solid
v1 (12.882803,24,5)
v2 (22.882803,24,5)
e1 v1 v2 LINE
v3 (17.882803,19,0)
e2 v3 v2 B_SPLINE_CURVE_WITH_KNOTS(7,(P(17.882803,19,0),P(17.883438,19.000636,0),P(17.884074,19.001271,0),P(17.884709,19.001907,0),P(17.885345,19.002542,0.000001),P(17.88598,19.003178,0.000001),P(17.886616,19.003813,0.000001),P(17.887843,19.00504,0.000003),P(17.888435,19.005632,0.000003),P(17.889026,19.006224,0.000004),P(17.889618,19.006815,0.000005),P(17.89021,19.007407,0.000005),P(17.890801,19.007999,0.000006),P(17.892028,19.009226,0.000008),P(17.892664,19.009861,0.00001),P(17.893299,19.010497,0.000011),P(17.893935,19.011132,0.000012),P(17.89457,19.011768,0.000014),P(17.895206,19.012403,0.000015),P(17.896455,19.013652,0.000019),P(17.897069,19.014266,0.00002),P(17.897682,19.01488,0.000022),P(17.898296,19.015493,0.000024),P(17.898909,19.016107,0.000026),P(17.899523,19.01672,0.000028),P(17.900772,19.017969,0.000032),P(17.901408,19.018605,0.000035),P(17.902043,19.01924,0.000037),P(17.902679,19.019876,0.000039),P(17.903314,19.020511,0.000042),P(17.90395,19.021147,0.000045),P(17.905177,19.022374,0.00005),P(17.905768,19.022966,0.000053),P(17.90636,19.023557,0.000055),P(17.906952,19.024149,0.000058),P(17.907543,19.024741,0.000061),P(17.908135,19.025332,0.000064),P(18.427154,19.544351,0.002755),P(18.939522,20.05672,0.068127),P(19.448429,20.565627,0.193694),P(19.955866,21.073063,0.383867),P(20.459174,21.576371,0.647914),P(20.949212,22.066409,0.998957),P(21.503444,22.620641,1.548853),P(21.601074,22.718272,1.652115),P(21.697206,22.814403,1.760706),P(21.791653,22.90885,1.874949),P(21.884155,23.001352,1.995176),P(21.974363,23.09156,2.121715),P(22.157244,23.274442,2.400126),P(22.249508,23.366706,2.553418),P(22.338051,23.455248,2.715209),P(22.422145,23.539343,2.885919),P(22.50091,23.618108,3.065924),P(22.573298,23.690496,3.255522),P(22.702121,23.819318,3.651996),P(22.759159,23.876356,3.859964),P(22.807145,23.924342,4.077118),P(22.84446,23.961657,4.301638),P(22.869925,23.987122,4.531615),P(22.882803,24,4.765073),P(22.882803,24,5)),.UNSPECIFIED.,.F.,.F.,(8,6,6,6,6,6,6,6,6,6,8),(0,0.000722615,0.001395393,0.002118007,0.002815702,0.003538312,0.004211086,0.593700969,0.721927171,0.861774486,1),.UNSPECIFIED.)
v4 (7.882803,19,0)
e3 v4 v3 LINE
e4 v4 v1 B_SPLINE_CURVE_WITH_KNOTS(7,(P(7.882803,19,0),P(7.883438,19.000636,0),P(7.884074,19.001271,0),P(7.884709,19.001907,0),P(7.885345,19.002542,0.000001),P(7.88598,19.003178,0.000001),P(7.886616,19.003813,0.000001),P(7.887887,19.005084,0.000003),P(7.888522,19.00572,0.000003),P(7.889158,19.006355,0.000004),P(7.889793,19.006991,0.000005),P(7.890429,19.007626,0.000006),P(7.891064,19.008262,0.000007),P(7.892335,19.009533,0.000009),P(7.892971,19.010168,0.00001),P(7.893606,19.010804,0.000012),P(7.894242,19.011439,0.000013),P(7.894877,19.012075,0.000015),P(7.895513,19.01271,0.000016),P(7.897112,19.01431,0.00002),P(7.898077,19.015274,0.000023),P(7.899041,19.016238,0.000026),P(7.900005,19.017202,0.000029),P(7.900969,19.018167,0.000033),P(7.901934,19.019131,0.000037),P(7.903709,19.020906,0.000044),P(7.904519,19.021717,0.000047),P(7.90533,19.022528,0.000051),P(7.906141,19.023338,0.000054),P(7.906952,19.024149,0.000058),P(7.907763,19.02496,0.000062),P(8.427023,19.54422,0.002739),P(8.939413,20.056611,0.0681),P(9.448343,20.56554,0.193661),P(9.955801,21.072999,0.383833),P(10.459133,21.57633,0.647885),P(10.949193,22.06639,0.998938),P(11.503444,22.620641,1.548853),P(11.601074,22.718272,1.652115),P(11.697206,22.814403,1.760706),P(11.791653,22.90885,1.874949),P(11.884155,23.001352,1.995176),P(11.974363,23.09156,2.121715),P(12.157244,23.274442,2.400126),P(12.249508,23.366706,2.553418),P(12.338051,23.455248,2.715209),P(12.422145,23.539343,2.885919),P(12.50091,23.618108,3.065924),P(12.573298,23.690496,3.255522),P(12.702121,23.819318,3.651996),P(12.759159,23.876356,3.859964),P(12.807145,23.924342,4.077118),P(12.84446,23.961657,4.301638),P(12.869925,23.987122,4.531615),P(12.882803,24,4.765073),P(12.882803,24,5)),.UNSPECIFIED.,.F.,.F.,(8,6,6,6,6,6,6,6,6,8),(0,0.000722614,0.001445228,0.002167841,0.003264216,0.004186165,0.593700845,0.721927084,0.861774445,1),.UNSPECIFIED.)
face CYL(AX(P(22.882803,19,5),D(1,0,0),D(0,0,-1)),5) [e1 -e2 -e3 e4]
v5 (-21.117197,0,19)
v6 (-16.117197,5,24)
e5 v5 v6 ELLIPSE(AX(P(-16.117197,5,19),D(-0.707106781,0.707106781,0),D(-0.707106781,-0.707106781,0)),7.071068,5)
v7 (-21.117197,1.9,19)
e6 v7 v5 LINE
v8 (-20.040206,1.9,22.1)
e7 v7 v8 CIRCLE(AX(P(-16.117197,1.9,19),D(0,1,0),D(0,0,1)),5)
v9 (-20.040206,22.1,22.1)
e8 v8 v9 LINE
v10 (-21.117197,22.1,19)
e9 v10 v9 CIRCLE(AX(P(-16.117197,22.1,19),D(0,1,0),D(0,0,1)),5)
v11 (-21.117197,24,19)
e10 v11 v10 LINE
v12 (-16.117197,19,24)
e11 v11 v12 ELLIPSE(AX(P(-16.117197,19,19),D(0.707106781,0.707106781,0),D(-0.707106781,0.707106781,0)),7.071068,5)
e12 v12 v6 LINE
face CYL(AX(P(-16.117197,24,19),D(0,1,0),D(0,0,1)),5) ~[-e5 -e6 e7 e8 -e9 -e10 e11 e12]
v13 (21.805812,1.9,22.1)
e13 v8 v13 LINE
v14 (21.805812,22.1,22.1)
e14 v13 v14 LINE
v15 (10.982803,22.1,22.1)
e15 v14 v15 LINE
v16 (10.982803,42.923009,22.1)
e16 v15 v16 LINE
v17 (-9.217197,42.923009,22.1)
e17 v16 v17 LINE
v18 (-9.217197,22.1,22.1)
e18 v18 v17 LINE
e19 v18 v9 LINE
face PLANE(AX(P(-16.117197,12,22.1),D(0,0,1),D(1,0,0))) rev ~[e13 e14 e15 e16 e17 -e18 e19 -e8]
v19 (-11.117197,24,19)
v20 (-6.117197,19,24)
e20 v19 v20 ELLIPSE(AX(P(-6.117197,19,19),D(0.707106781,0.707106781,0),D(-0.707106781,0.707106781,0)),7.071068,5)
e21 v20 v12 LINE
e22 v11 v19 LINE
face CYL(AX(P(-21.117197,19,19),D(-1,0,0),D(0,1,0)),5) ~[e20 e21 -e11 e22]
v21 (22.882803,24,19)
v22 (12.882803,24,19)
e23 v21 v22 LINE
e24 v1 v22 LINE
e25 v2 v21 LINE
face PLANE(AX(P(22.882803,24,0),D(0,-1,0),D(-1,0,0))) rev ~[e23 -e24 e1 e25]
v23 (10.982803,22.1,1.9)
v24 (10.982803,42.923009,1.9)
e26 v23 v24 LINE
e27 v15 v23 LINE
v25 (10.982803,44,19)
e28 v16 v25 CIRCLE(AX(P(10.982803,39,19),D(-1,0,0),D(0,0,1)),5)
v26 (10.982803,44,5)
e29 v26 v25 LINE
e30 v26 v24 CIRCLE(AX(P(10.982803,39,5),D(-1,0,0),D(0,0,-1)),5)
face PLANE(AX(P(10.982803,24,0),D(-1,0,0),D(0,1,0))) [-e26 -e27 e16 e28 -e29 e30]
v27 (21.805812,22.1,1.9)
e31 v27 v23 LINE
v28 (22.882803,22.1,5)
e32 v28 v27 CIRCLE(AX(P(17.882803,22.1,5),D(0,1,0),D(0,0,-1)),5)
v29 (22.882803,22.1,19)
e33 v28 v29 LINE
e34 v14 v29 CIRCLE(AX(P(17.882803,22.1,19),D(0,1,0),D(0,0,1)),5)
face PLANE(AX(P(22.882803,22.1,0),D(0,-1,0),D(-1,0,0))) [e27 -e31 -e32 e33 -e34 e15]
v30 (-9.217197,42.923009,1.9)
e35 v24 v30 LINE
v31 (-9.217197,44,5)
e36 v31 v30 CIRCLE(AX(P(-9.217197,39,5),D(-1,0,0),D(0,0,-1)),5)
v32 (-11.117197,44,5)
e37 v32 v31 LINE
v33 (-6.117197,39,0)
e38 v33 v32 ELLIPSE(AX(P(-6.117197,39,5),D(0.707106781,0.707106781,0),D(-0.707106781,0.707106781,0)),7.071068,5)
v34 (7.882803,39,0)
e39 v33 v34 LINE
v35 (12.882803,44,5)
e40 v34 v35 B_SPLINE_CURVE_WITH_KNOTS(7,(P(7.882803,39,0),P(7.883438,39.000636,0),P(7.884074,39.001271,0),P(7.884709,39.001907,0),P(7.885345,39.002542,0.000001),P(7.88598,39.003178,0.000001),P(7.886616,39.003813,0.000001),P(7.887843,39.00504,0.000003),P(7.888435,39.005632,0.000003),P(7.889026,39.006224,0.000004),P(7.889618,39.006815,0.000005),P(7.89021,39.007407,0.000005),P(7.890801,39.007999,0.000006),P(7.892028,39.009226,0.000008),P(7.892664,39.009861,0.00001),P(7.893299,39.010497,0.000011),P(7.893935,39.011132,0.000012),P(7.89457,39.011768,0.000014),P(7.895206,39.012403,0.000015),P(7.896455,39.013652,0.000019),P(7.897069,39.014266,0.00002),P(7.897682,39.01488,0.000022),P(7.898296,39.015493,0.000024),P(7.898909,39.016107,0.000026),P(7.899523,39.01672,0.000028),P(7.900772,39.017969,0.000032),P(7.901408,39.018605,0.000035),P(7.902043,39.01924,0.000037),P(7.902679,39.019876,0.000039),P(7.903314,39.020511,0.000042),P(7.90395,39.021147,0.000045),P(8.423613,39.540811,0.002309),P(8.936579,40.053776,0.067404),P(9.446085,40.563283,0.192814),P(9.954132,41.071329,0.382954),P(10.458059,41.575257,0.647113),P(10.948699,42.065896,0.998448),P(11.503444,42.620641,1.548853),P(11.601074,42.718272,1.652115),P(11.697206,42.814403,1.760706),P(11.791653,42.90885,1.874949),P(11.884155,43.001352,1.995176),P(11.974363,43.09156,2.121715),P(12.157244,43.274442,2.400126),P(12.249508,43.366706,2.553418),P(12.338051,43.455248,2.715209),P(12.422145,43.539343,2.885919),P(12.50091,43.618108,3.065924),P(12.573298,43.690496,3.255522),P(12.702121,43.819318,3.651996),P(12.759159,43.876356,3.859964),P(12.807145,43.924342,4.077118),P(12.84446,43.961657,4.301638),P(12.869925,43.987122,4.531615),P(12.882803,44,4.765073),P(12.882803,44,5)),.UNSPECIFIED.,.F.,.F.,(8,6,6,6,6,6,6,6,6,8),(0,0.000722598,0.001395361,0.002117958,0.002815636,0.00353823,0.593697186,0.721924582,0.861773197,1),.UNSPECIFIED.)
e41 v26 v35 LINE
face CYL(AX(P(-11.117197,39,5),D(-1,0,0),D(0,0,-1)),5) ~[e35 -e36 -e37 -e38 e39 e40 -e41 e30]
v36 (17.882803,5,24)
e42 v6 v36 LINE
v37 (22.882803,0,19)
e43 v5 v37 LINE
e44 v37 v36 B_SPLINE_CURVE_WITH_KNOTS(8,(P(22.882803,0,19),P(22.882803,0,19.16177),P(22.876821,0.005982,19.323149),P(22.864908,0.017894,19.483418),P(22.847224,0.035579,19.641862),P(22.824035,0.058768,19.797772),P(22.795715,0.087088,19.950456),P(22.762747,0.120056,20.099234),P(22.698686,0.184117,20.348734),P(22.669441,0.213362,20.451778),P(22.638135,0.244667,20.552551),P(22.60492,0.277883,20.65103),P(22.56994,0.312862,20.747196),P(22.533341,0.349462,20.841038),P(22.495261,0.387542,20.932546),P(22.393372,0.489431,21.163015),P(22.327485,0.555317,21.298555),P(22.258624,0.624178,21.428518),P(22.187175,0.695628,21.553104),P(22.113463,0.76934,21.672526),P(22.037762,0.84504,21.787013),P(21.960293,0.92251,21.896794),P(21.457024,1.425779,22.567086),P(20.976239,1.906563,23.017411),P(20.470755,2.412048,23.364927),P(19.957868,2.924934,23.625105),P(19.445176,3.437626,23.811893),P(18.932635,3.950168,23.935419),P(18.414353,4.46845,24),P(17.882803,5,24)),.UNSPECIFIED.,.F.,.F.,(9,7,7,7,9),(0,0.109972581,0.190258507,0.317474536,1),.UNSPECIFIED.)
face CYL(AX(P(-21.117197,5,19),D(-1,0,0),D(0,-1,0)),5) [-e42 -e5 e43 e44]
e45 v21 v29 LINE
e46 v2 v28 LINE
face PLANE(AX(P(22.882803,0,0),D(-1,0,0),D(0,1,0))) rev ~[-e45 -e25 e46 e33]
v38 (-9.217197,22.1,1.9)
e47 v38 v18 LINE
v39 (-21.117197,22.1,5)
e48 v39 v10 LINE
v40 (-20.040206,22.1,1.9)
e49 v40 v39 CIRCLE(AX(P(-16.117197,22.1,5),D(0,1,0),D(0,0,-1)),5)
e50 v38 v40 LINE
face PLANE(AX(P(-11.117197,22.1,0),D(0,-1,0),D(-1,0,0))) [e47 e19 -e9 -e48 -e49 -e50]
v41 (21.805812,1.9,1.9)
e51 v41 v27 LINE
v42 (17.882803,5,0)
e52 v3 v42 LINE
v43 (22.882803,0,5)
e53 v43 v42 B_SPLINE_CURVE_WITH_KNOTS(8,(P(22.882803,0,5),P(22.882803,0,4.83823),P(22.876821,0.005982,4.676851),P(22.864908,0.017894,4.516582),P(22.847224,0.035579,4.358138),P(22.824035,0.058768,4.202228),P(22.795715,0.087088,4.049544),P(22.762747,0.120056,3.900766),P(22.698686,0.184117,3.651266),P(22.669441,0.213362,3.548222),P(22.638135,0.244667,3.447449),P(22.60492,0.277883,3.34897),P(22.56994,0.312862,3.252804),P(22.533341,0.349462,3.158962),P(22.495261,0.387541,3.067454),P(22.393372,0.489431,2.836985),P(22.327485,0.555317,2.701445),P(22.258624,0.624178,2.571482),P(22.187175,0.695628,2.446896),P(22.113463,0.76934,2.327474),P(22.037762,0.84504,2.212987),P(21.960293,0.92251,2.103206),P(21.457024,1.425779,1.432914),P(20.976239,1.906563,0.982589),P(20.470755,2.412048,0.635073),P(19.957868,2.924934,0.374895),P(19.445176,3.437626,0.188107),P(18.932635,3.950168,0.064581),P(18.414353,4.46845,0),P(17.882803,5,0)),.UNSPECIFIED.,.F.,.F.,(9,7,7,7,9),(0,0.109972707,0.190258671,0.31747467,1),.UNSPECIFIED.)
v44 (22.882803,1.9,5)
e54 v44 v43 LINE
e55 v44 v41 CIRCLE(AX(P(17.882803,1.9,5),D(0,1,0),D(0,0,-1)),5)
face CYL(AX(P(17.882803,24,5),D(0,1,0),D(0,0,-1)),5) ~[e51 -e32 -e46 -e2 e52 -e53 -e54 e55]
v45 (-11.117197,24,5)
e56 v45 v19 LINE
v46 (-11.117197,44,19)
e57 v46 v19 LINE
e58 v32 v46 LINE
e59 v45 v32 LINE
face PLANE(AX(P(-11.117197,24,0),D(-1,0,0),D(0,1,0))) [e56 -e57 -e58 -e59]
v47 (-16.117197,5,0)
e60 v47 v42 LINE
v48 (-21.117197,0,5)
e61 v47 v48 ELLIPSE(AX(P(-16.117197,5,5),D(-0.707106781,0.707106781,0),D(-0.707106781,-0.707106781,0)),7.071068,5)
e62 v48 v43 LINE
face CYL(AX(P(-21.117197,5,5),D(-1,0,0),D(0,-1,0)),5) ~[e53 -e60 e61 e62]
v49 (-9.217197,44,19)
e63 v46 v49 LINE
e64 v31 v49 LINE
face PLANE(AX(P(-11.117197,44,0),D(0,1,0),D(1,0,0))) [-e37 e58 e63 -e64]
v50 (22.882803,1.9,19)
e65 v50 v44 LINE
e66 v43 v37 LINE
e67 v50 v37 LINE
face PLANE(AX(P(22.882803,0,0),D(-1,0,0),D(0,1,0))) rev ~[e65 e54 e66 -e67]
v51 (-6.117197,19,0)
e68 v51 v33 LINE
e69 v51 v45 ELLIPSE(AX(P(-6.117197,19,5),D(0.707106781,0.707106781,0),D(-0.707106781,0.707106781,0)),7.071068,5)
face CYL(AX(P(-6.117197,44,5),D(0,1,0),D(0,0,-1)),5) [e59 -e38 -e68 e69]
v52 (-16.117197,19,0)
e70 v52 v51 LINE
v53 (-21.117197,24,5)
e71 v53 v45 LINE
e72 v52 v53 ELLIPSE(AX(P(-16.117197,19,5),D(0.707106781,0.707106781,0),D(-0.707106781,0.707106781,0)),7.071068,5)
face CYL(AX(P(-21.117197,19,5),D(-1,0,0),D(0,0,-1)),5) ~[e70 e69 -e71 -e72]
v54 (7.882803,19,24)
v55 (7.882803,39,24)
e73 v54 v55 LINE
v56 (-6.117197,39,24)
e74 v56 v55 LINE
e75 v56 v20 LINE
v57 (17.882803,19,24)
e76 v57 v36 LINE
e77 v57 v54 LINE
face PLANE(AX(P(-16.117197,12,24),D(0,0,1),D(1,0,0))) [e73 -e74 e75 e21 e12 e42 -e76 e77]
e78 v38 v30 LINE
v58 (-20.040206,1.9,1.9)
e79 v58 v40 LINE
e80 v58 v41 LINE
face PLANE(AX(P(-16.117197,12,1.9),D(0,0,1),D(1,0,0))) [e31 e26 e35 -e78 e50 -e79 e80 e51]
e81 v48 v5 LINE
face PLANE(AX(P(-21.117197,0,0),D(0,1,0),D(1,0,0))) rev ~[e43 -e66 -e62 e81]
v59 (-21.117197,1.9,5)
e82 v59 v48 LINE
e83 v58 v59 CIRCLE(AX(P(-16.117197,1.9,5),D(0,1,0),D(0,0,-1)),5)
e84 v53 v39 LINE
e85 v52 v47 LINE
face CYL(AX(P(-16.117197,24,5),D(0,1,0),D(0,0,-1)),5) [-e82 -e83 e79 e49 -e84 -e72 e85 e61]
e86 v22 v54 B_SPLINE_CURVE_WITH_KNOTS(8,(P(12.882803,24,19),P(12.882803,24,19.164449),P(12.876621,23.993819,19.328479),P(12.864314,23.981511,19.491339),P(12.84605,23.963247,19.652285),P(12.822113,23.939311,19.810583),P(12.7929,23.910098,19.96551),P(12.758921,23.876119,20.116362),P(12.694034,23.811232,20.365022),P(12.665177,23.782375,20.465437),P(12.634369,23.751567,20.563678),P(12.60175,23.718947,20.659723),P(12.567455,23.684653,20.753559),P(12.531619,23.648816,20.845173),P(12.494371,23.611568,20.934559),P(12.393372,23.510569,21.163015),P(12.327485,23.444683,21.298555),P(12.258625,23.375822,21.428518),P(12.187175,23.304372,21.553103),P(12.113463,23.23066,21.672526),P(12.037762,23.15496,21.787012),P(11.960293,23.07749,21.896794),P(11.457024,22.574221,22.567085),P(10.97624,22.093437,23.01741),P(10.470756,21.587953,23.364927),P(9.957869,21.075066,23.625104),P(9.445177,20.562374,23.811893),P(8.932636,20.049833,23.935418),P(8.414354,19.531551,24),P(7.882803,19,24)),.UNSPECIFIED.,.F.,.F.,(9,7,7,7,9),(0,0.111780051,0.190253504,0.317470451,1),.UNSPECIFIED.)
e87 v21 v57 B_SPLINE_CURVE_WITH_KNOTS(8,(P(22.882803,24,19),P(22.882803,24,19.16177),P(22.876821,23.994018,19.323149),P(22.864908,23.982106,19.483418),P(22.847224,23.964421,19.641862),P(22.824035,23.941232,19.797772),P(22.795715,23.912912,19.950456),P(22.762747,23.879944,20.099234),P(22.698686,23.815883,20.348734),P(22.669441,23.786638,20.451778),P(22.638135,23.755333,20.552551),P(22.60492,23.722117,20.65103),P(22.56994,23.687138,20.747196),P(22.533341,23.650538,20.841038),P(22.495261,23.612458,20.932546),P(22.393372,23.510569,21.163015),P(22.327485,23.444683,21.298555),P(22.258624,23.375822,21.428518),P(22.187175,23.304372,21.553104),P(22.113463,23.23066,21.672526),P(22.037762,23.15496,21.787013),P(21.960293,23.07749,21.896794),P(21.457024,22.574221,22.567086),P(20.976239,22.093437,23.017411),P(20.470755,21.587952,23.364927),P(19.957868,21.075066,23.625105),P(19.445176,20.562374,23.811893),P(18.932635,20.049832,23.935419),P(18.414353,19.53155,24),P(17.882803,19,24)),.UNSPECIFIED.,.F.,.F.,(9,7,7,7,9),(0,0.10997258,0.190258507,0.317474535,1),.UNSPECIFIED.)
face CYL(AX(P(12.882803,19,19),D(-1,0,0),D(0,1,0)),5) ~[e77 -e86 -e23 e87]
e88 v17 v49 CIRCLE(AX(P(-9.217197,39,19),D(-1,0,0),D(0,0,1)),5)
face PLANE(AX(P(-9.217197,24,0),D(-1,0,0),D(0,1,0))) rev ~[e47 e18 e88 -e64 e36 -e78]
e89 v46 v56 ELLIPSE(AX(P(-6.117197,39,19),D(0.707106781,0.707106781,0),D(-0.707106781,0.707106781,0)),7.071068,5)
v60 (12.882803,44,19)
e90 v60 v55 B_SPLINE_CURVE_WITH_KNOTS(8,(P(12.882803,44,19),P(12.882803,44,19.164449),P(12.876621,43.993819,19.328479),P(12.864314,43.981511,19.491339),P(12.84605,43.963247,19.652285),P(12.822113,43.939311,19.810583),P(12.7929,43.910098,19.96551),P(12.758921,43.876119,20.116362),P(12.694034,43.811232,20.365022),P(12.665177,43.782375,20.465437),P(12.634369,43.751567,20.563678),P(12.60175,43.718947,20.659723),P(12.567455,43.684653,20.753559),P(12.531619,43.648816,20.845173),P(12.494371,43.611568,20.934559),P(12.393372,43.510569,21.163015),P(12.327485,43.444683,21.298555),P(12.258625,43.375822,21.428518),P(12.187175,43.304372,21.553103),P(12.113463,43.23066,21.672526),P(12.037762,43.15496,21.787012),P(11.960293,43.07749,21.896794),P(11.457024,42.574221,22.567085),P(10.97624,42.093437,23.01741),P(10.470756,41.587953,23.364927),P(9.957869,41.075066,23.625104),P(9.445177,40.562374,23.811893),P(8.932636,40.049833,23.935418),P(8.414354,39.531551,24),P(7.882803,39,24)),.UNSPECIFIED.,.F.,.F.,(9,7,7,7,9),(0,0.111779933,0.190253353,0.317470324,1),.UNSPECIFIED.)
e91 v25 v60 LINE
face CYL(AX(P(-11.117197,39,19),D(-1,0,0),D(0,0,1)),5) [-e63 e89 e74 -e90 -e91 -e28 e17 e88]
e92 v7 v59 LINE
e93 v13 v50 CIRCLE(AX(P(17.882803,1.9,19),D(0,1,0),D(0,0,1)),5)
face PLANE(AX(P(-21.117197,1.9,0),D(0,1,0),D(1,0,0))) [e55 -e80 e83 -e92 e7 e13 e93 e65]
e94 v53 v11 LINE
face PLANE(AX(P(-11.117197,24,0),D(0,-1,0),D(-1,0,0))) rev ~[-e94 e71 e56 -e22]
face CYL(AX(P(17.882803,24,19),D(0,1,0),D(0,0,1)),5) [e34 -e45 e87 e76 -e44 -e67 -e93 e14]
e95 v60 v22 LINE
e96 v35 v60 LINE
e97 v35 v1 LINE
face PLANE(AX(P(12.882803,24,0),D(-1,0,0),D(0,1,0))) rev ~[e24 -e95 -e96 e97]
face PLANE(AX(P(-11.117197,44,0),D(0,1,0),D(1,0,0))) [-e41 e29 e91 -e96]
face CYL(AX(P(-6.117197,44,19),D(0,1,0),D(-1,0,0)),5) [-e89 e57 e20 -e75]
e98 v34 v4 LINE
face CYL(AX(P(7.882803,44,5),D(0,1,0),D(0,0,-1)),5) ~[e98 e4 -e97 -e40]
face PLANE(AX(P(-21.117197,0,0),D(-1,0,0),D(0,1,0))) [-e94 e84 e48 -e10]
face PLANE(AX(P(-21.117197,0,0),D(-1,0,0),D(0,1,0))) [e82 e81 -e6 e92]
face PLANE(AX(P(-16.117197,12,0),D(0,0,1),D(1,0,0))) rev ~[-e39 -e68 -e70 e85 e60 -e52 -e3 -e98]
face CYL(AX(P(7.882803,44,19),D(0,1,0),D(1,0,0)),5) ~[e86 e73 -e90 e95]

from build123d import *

# Parameters (mm, degrees)
F0_W          = 10
F0_H          = 24
F0_W_2        = 24
F0_H_2        = 20
F1_DEPTH      = 24
F2_T          = -1.9
F3_T1_DEPTH   = 44
F3_T3_DEPTH   = 24
F3_T5_DEPTH   = 10
F3_T7_DEPTH   = 20
F3_T9_DEPTH   = 24
F3_T11_DEPTH  = 10
F3_T17_DEPTH  = 56.5
F3_T21_DEPTH  = 36.5
F3_T28_DEPTH  = 56.5
F3_T32_DEPTH  = 36.5
F3_T39_DEPTH  = 22.5
F3_T43_DEPTH  = 36.5
F3_T50_DEPTH  = 22.5
F3_T54_DEPTH  = 32.5
F3_T61_DEPTH  = 32.5
F3_T65_DEPTH  = 36.5
F3_T72_DEPTH  = 32.5
F3_T76_DEPTH  = 36.5
F3_T83_DEPTH  = 32.5
F3_T87_DEPTH  = 22.5
F3_T94_DEPTH  = 22.5
F3_T98_DEPTH  = 36.5
F3_T105_DEPTH = 56.5
F3_T109_DEPTH = 36.5
F3_T116_DEPTH = 56.5
F3_T120_DEPTH = 36.5
F3_T127_DEPTH = 36.5
F3_T131_DEPTH = 22.5
F3_T138_DEPTH = 22.5
F3_T142_DEPTH = 32.5
F3_T149_DEPTH = 32.5
F3_T153_DEPTH = 36.5
F3_T160_DEPTH = 36.5
F3_T164_DEPTH = 32.5
F3_T171_DEPTH = 32.5
F3_T175_DEPTH = 22.5
F3_T182_DEPTH = 22.5
F3_T186_DEPTH = 36.5


# Not quite as in the source:
# - a fillet or chamfer that OpenCascade refuses, or shapes differently, is made with other operations: its cross-section is extruded or revolved along the edge and cut away or added


with BuildPart() as f1:
    # F0 (on Top) → F1 (new body)
    with BuildSketch(Plane.XY):
        with Locations((-16.1171973497, 12)):
            Rectangle(F0_W, F0_H)
        with Locations((0.8828026503, 12)):
            Rectangle(F0_W_2, F0_H)
        with Locations((17.8828026503, 12)):
            Rectangle(F0_W, F0_H)
        with Locations((0.8828026503, 34)):
            Rectangle(F0_W_2, F0_H_2)
    extrude(amount=F1_DEPTH)

    # F2
    f2_openings = [f1.faces().sort_by_distance(p)[0] for p in [
        (-21.117197, 12, 12),
        (22.882803, 12, 12),
        (0.882803, 44, 12),
    ]]
    offset(amount=F2_T, openings=f2_openings, kind=Kind.INTERSECTION)

    # F3: fillet of radius 5 on 16 edges, made by hand

    # F3_s2 → F3_t1 (cut)
    with BuildSketch(Plane.YZ.offset(-21.1171973497)):
        with BuildLine():
            ThreePointArc((0, 19), (1.4644660941, 22.5355339059), (5, 24))
            Line((5, 24), (5, 24.1))
            Line((5, 24.1), (-0.1, 24.1))
            Line((-0.1, 24.1), (-0.1, 19))
            Line((-0.1, 19), (0, 19))
        make_face()
        with BuildLine():
            ThreePointArc((0, 5), (1.4644660941, 1.4644660941), (5, 0))
            Line((5, 0), (5, -0.1))
            Line((5, -0.1), (-0.1, -0.1))
            Line((-0.1, -0.1), (-0.1, 5))
            Line((-0.1, 5), (0, 5))
        make_face()
    extrude(amount=F3_T1_DEPTH, mode=Mode.SUBTRACT)

    # F3_s4 → F3_t3 (cut)
    with BuildSketch(Plane.XZ.offset(-24)):
        with BuildLine():
            ThreePointArc((17.8828026503, 24), (21.4183365563, 22.5355339059), (22.8828026503, 19))
            Line((22.8828026503, 19), (22.9828026503, 19))
            Line((22.9828026503, 19), (22.9828026503, 24.1))
            Line((22.9828026503, 24.1), (17.8828026503, 24.1))
            Line((17.8828026503, 24.1), (17.8828026503, 24))
        make_face()
        with BuildLine():
            ThreePointArc((-16.1171973497, 24), (-19.6527312556, 22.5355339059), (-21.1171973497, 19))
            Line((-21.1171973497, 19), (-21.2171973497, 19))
            Line((-21.2171973497, 19), (-21.2171973497, 24.1))
            Line((-21.2171973497, 24.1), (-16.1171973497, 24.1))
            Line((-16.1171973497, 24.1), (-16.1171973497, 24))
        make_face()
        with BuildLine():
            ThreePointArc((17.8828026503, 0), (21.4183365563, 1.4644660941), (22.8828026503, 5))
            Line((22.8828026503, 5), (22.9828026503, 5))
            Line((22.9828026503, 5), (22.9828026503, -0.1))
            Line((22.9828026503, -0.1), (17.8828026503, -0.1))
            Line((17.8828026503, -0.1), (17.8828026503, 0))
        make_face()
        with BuildLine():
            ThreePointArc((-16.1171973497, 0), (-19.6527312556, 1.4644660941), (-21.1171973497, 5))
            Line((-21.1171973497, 5), (-21.2171973497, 5))
            Line((-21.2171973497, 5), (-21.2171973497, -0.1))
            Line((-21.2171973497, -0.1), (-16.1171973497, -0.1))
            Line((-16.1171973497, -0.1), (-16.1171973497, 0))
        make_face()
    extrude(amount=F3_T3_DEPTH, mode=Mode.SUBTRACT)

    # F3_s6 → F3_t5 (cut)
    with BuildSketch(Plane.YZ.offset(12.8828026503)):
        with BuildLine():
            ThreePointArc((24, 19), (22.5355339059, 22.5355339059), (19, 24))
            Line((19, 24), (19, 24.1))
            Line((19, 24.1), (24.1, 24.1))
            Line((24.1, 24.1), (24.1, 19))
            Line((24.1, 19), (24, 19))
        make_face()
        with BuildLine():
            ThreePointArc((19, 0), (22.5355339059, 1.4644660941), (24, 5))
            Line((24, 5), (24.1, 5))
            Line((24.1, 5), (24.1, -0.1))
            Line((24.1, -0.1), (19, -0.1))
            Line((19, -0.1), (19, 0))
        make_face()
    extrude(amount=F3_T5_DEPTH, mode=Mode.SUBTRACT)

    # F3_s8 → F3_t7 (cut)
    with BuildSketch(Plane.XZ.offset(-44)):
        with BuildLine():
            ThreePointArc((12.8828026503, 19), (11.4183365563, 22.5355339059), (7.8828026503, 24))
            Line((7.8828026503, 24), (7.8828026503, 24.1))
            Line((7.8828026503, 24.1), (12.9828026503, 24.1))
            Line((12.9828026503, 24.1), (12.9828026503, 19))
            Line((12.9828026503, 19), (12.8828026503, 19))
        make_face()
        with BuildLine():
            ThreePointArc((-11.1171973497, 19), (-9.6527312556, 22.5355339059), (-6.1171973497, 24))
            Line((-6.1171973497, 24), (-6.1171973497, 24.1))
            Line((-6.1171973497, 24.1), (-11.2171973497, 24.1))
            Line((-11.2171973497, 24.1), (-11.2171973497, 19))
            Line((-11.2171973497, 19), (-11.1171973497, 19))
        make_face()
        with BuildLine():
            ThreePointArc((7.8828026503, 0), (11.4183365563, 1.4644660941), (12.8828026503, 5))
            Line((12.8828026503, 5), (12.9828026503, 5))
            Line((12.9828026503, 5), (12.9828026503, -0.1))
            Line((12.9828026503, -0.1), (7.8828026503, -0.1))
            Line((7.8828026503, -0.1), (7.8828026503, 0))
        make_face()
        with BuildLine():
            ThreePointArc((-6.1171973497, 0), (-9.6527312556, 1.4644660941), (-11.1171973497, 5))
            Line((-11.1171973497, 5), (-11.2171973497, 5))
            Line((-11.2171973497, 5), (-11.2171973497, -0.1))
            Line((-11.2171973497, -0.1), (-6.1171973497, -0.1))
            Line((-6.1171973497, -0.1), (-6.1171973497, 0))
        make_face()
    extrude(amount=F3_T7_DEPTH, mode=Mode.SUBTRACT)

    # F3_s10 → F3_t9 (cut)
    with BuildSketch(Plane.YZ.offset(-11.1171973497)):
        with BuildLine():
            ThreePointArc((39, 24), (42.5355339059, 22.5355339059), (44, 19))
            Line((44, 19), (44.1, 19))
            Line((44.1, 19), (44.1, 24.1))
            Line((44.1, 24.1), (39, 24.1))
            Line((39, 24.1), (39, 24))
        make_face()
        with BuildLine():
            ThreePointArc((39, 0), (42.5355339059, 1.4644660941), (44, 5))
            Line((44, 5), (44.1, 5))
            Line((44.1, 5), (44.1, -0.1))
            Line((44.1, -0.1), (39, -0.1))
            Line((39, -0.1), (39, 0))
        make_face()
    extrude(amount=F3_T9_DEPTH, mode=Mode.SUBTRACT)

    # F3_s12 → F3_t11 (cut)
    with BuildSketch(Plane.YZ.offset(-21.1171973497)):
        with BuildLine():
            ThreePointArc((24, 19), (22.5355339059, 22.5355339059), (19, 24))
            Line((19, 24), (19, 24.1))
            Line((19, 24.1), (24.1, 24.1))
            Line((24.1, 24.1), (24.1, 19))
            Line((24.1, 19), (24, 19))
        make_face()
        with BuildLine():
            ThreePointArc((19, 0), (22.5355339059, 1.4644660941), (24, 5))
            Line((24, 5), (24.1, 5))
            Line((24.1, 5), (24.1, -0.1))
            Line((24.1, -0.1), (19, -0.1))
            Line((19, -0.1), (19, 0))
        make_face()
    extrude(amount=F3_T11_DEPTH, mode=Mode.SUBTRACT)


with BuildPart() as f3_tool15:
    # F3_s16 → F3_t17 (new body)
    with BuildSketch(Plane.YZ.offset(-33.6171973497)):
        with BuildLine():
            ThreePointArc((0, 19), (1.4644660941, 22.5355339059), (5, 24))
            Line((5, 24), (5, 24.1))
            Line((5, 24.1), (-0.1, 24.1))
            Line((-0.1, 24.1), (-0.1, 19))
            Line((-0.1, 19), (0, 19))
        make_face()
    extrude(amount=F3_T17_DEPTH)

    split(bisect_by=Plane.YZ.offset(-21.1171973497), keep=Keep.BOTTOM)


with BuildPart() as f3_tool19:
    # F3_s20 → F3_t21 (new body)
    with BuildSketch(Plane.XZ.offset(-24)):
        with BuildLine():
            ThreePointArc((-16.1171973497, 24), (-19.6527312556, 22.5355339059), (-21.1171973497, 19))
            Line((-21.1171973497, 19), (-21.2171973497, 19))
            Line((-21.2171973497, 19), (-21.2171973497, 24.1))
            Line((-21.2171973497, 24.1), (-16.1171973497, 24.1))
            Line((-16.1171973497, 24.1), (-16.1171973497, 24))
        make_face()
    extrude(amount=F3_T21_DEPTH)

    split(bisect_by=Plane.XZ, keep=Keep.TOP)


with BuildPart() as f3_tool15_1:
    add(f3_tool15.part)

    # F3_t23: intersect F3_tool19
    add(f3_tool19.part, mode=Mode.INTERSECT)


with BuildPart() as f1_1:
    add(f1.part)

    # F3_t13: cut F3_tool15
    add(f3_tool15_1.part, mode=Mode.SUBTRACT)


with BuildPart() as f3_tool26:
    # F3_s27 → F3_t28 (new body)
    with BuildSketch(Plane.YZ.offset(-21.1171973497)):
        with BuildLine():
            ThreePointArc((0, 19), (1.4644660941, 22.5355339059), (5, 24))
            Line((5, 24), (5, 24.1))
            Line((5, 24.1), (-0.1, 24.1))
            Line((-0.1, 24.1), (-0.1, 19))
            Line((-0.1, 19), (0, 19))
        make_face()
    extrude(amount=F3_T28_DEPTH)

    split(bisect_by=Plane.YZ.offset(22.8828026503), keep=Keep.TOP)


with BuildPart() as f3_tool30:
    # F3_s31 → F3_t32 (new body)
    with BuildSketch(Plane.XZ.offset(12.5)):
        with BuildLine():
            ThreePointArc((17.8828026503, 24), (21.4183365563, 22.5355339059), (22.8828026503, 19))
            Line((22.8828026503, 19), (22.9828026503, 19))
            Line((22.9828026503, 19), (22.9828026503, 24.1))
            Line((22.9828026503, 24.1), (17.8828026503, 24.1))
            Line((17.8828026503, 24.1), (17.8828026503, 24))
        make_face()
    extrude(amount=-F3_T32_DEPTH)

    split(bisect_by=Plane.XZ, keep=Keep.TOP)


with BuildPart() as f3_tool26_1:
    add(f3_tool26.part)

    # F3_t34: intersect F3_tool30
    add(f3_tool30.part, mode=Mode.INTERSECT)


with BuildPart() as f1_2:
    add(f1_1.part)

    # F3_t24: cut F3_tool26
    add(f3_tool26_1.part, mode=Mode.SUBTRACT)


with BuildPart() as f3_tool37:
    # F3_s38 → F3_t39 (new body)
    with BuildSketch(Plane.YZ.offset(35.3828026503)):
        with BuildLine():
            ThreePointArc((24, 19), (22.5355339059, 22.5355339059), (19, 24))
            Line((19, 24), (19, 24.1))
            Line((19, 24.1), (24.1, 24.1))
            Line((24.1, 24.1), (24.1, 19))
            Line((24.1, 19), (24, 19))
        make_face()
    extrude(amount=-F3_T39_DEPTH)

    split(bisect_by=Plane.YZ.offset(22.8828026503), keep=Keep.TOP)


with BuildPart() as f3_tool41:
    # F3_s42 → F3_t43 (new body)
    with BuildSketch(Plane.XZ):
        with BuildLine():
            ThreePointArc((17.8828026503, 24), (21.4183365563, 22.5355339059), (22.8828026503, 19))
            Line((22.8828026503, 19), (22.9828026503, 19))
            Line((22.9828026503, 19), (22.9828026503, 24.1))
            Line((22.9828026503, 24.1), (17.8828026503, 24.1))
            Line((17.8828026503, 24.1), (17.8828026503, 24))
        make_face()
    extrude(amount=-F3_T43_DEPTH)

    split(bisect_by=Plane.XZ.offset(-24), keep=Keep.BOTTOM)


with BuildPart() as f3_tool37_1:
    add(f3_tool37.part)

    # F3_t45: intersect F3_tool41
    add(f3_tool41.part, mode=Mode.INTERSECT)


with BuildPart() as f1_3:
    add(f1_2.part)

    # F3_t35: cut F3_tool37
    add(f3_tool37_1.part, mode=Mode.SUBTRACT)


with BuildPart() as f3_tool48:
    # F3_s49 → F3_t50 (new body)
    with BuildSketch(Plane.YZ.offset(22.8828026503)):
        with BuildLine():
            ThreePointArc((24, 19), (22.5355339059, 22.5355339059), (19, 24))
            Line((19, 24), (19, 24.1))
            Line((19, 24.1), (24.1, 24.1))
            Line((24.1, 24.1), (24.1, 19))
            Line((24.1, 19), (24, 19))
        make_face()
    extrude(amount=-F3_T50_DEPTH)

    split(bisect_by=Plane.YZ.offset(12.8828026503), keep=Keep.BOTTOM)


with BuildPart() as f3_tool52:
    # F3_s53 → F3_t54 (new body)
    with BuildSketch(Plane.XZ.offset(-11.5)):
        with BuildLine():
            ThreePointArc((12.8828026503, 19), (11.4183365563, 22.5355339059), (7.8828026503, 24))
            Line((7.8828026503, 24), (7.8828026503, 24.1))
            Line((7.8828026503, 24.1), (12.9828026503, 24.1))
            Line((12.9828026503, 24.1), (12.9828026503, 19))
            Line((12.9828026503, 19), (12.8828026503, 19))
        make_face()
    extrude(amount=-F3_T54_DEPTH)

    split(bisect_by=Plane.XZ.offset(-24), keep=Keep.TOP)


with BuildPart() as f3_tool48_1:
    add(f3_tool48.part)

    # F3_t56: intersect F3_tool52
    add(f3_tool52.part, mode=Mode.INTERSECT)


with BuildPart() as f1_4:
    add(f1_3.part)

    # F3_t46: cut F3_tool48
    add(f3_tool48_1.part, mode=Mode.SUBTRACT)


with BuildPart() as f3_tool59:
    # F3_s60 → F3_t61 (new body)
    with BuildSketch(Plane.XZ.offset(-24)):
        with BuildLine():
            ThreePointArc((12.8828026503, 19), (11.4183365563, 22.5355339059), (7.8828026503, 24))
            Line((7.8828026503, 24), (7.8828026503, 24.1))
            Line((7.8828026503, 24.1), (12.9828026503, 24.1))
            Line((12.9828026503, 24.1), (12.9828026503, 19))
            Line((12.9828026503, 19), (12.8828026503, 19))
        make_face()
    extrude(amount=-F3_T61_DEPTH)

    split(bisect_by=Plane.XZ.offset(-44), keep=Keep.BOTTOM)


with BuildPart() as f3_tool63:
    # F3_s64 → F3_t65 (new body)
    with BuildSketch(Plane.YZ.offset(25.3828026503)):
        with BuildLine():
            ThreePointArc((39, 24), (42.5355339059, 22.5355339059), (44, 19))
            Line((44, 19), (44.1, 19))
            Line((44.1, 19), (44.1, 24.1))
            Line((44.1, 24.1), (39, 24.1))
            Line((39, 24.1), (39, 24))
        make_face()
    extrude(amount=-F3_T65_DEPTH)

    split(bisect_by=Plane.YZ.offset(12.8828026503), keep=Keep.TOP)


with BuildPart() as f3_tool59_1:
    add(f3_tool59.part)

    # F3_t67: intersect F3_tool63
    add(f3_tool63.part, mode=Mode.INTERSECT)


with BuildPart() as f1_5:
    add(f1_4.part)

    # F3_t57: cut F3_tool59
    add(f3_tool59_1.part, mode=Mode.SUBTRACT)


with BuildPart() as f3_tool70:
    # F3_s71 → F3_t72 (new body)
    with BuildSketch(Plane.XZ.offset(-56.5)):
        with BuildLine():
            ThreePointArc((-11.1171973497, 19), (-9.6527312556, 22.5355339059), (-6.1171973497, 24))
            Line((-6.1171973497, 24), (-6.1171973497, 24.1))
            Line((-6.1171973497, 24.1), (-11.2171973497, 24.1))
            Line((-11.2171973497, 24.1), (-11.2171973497, 19))
            Line((-11.2171973497, 19), (-11.1171973497, 19))
        make_face()
    extrude(amount=F3_T72_DEPTH)

    split(bisect_by=Plane.XZ.offset(-44), keep=Keep.BOTTOM)


with BuildPart() as f3_tool74:
    # F3_s75 → F3_t76 (new body)
    with BuildSketch(Plane.YZ.offset(12.8828026503)):
        with BuildLine():
            ThreePointArc((39, 24), (42.5355339059, 22.5355339059), (44, 19))
            Line((44, 19), (44.1, 19))
            Line((44.1, 19), (44.1, 24.1))
            Line((44.1, 24.1), (39, 24.1))
            Line((39, 24.1), (39, 24))
        make_face()
    extrude(amount=-F3_T76_DEPTH)

    split(bisect_by=Plane.YZ.offset(-11.1171973497), keep=Keep.BOTTOM)


with BuildPart() as f3_tool70_1:
    add(f3_tool70.part)

    # F3_t78: intersect F3_tool74
    add(f3_tool74.part, mode=Mode.INTERSECT)


with BuildPart() as f1_6:
    add(f1_5.part)

    # F3_t68: cut F3_tool70
    add(f3_tool70_1.part, mode=Mode.SUBTRACT)


with BuildPart() as f3_tool81:
    # F3_s82 → F3_t83 (new body)
    with BuildSketch(Plane.XZ.offset(-44)):
        with BuildLine():
            ThreePointArc((-11.1171973497, 19), (-9.6527312556, 22.5355339059), (-6.1171973497, 24))
            Line((-6.1171973497, 24), (-6.1171973497, 24.1))
            Line((-6.1171973497, 24.1), (-11.2171973497, 24.1))
            Line((-11.2171973497, 24.1), (-11.2171973497, 19))
            Line((-11.2171973497, 19), (-11.1171973497, 19))
        make_face()
    extrude(amount=F3_T83_DEPTH)

    split(bisect_by=Plane.XZ.offset(-24), keep=Keep.TOP)


with BuildPart() as f3_tool85:
    # F3_s86 → F3_t87 (new body)
    with BuildSketch(Plane.YZ.offset(1.3828026503)):
        with BuildLine():
            ThreePointArc((24, 19), (22.5355339059, 22.5355339059), (19, 24))
            Line((19, 24), (19, 24.1))
            Line((19, 24.1), (24.1, 24.1))
            Line((24.1, 24.1), (24.1, 19))
            Line((24.1, 19), (24, 19))
        make_face()
    extrude(amount=-F3_T87_DEPTH)

    split(bisect_by=Plane.YZ.offset(-11.1171973497), keep=Keep.TOP)


with BuildPart() as f3_tool81_1:
    add(f3_tool81.part)

    # F3_t89: intersect F3_tool85
    add(f3_tool85.part, mode=Mode.INTERSECT)


with BuildPart() as f1_7:
    add(f1_6.part)

    # F3_t79: cut F3_tool81
    add(f3_tool81_1.part, mode=Mode.SUBTRACT)


with BuildPart() as f3_tool92:
    # F3_s93 → F3_t94 (new body)
    with BuildSketch(Plane.YZ.offset(-11.1171973497)):
        with BuildLine():
            ThreePointArc((24, 19), (22.5355339059, 22.5355339059), (19, 24))
            Line((19, 24), (19, 24.1))
            Line((19, 24.1), (24.1, 24.1))
            Line((24.1, 24.1), (24.1, 19))
            Line((24.1, 19), (24, 19))
        make_face()
    extrude(amount=-F3_T94_DEPTH)

    split(bisect_by=Plane.YZ.offset(-21.1171973497), keep=Keep.BOTTOM)


with BuildPart() as f3_tool96:
    # F3_s97 → F3_t98 (new body)
    with BuildSketch(Plane.XZ.offset(-36.5)):
        with BuildLine():
            ThreePointArc((-16.1171973497, 24), (-19.6527312556, 22.5355339059), (-21.1171973497, 19))
            Line((-21.1171973497, 19), (-21.2171973497, 19))
            Line((-21.2171973497, 19), (-21.2171973497, 24.1))
            Line((-21.2171973497, 24.1), (-16.1171973497, 24.1))
            Line((-16.1171973497, 24.1), (-16.1171973497, 24))
        make_face()
    extrude(amount=F3_T98_DEPTH)

    split(bisect_by=Plane.XZ.offset(-24), keep=Keep.BOTTOM)


with BuildPart() as f3_tool92_1:
    add(f3_tool92.part)

    # F3_t100: intersect F3_tool96
    add(f3_tool96.part, mode=Mode.INTERSECT)


with BuildPart() as f1_8:
    add(f1_7.part)

    # F3_t90: cut F3_tool92
    add(f3_tool92_1.part, mode=Mode.SUBTRACT)


with BuildPart() as f3_tool103:
    # F3_s104 → F3_t105 (new body)
    with BuildSketch(Plane.YZ.offset(-33.6171973497)):
        with BuildLine():
            ThreePointArc((0, 5), (1.4644660941, 1.4644660941), (5, 0))
            Line((5, 0), (5, -0.1))
            Line((5, -0.1), (-0.1, -0.1))
            Line((-0.1, -0.1), (-0.1, 5))
            Line((-0.1, 5), (0, 5))
        make_face()
    extrude(amount=F3_T105_DEPTH)

    split(bisect_by=Plane.YZ.offset(-21.1171973497), keep=Keep.BOTTOM)


with BuildPart() as f3_tool107:
    # F3_s108 → F3_t109 (new body)
    with BuildSketch(Plane.XZ.offset(-24)):
        with BuildLine():
            ThreePointArc((-16.1171973497, 0), (-19.6527312556, 1.4644660941), (-21.1171973497, 5))
            Line((-21.1171973497, 5), (-21.2171973497, 5))
            Line((-21.2171973497, 5), (-21.2171973497, -0.1))
            Line((-21.2171973497, -0.1), (-16.1171973497, -0.1))
            Line((-16.1171973497, -0.1), (-16.1171973497, 0))
        make_face()
    extrude(amount=F3_T109_DEPTH)

    split(bisect_by=Plane.XZ, keep=Keep.TOP)


with BuildPart() as f3_tool103_1:
    add(f3_tool103.part)

    # F3_t111: intersect F3_tool107
    add(f3_tool107.part, mode=Mode.INTERSECT)


with BuildPart() as f1_9:
    add(f1_8.part)

    # F3_t101: cut F3_tool103
    add(f3_tool103_1.part, mode=Mode.SUBTRACT)


with BuildPart() as f3_tool114:
    # F3_s115 → F3_t116 (new body)
    with BuildSketch(Plane.YZ.offset(-21.1171973497)):
        with BuildLine():
            ThreePointArc((0, 5), (1.4644660941, 1.4644660941), (5, 0))
            Line((5, 0), (5, -0.1))
            Line((5, -0.1), (-0.1, -0.1))
            Line((-0.1, -0.1), (-0.1, 5))
            Line((-0.1, 5), (0, 5))
        make_face()
    extrude(amount=F3_T116_DEPTH)

    split(bisect_by=Plane.YZ.offset(22.8828026503), keep=Keep.TOP)


with BuildPart() as f3_tool118:
    # F3_s119 → F3_t120 (new body)
    with BuildSketch(Plane.XZ.offset(12.5)):
        with BuildLine():
            ThreePointArc((17.8828026503, 0), (21.4183365563, 1.4644660941), (22.8828026503, 5))
            Line((22.8828026503, 5), (22.9828026503, 5))
            Line((22.9828026503, 5), (22.9828026503, -0.1))
            Line((22.9828026503, -0.1), (17.8828026503, -0.1))
            Line((17.8828026503, -0.1), (17.8828026503, 0))
        make_face()
    extrude(amount=-F3_T120_DEPTH)

    split(bisect_by=Plane.XZ, keep=Keep.TOP)


with BuildPart() as f3_tool114_1:
    add(f3_tool114.part)

    # F3_t122: intersect F3_tool118
    add(f3_tool118.part, mode=Mode.INTERSECT)


with BuildPart() as f1_10:
    add(f1_9.part)

    # F3_t112: cut F3_tool114
    add(f3_tool114_1.part, mode=Mode.SUBTRACT)


with BuildPart() as f3_tool125:
    # F3_s126 → F3_t127 (new body)
    with BuildSketch(Plane.XZ):
        with BuildLine():
            ThreePointArc((17.8828026503, 0), (21.4183365563, 1.4644660941), (22.8828026503, 5))
            Line((22.8828026503, 5), (22.9828026503, 5))
            Line((22.9828026503, 5), (22.9828026503, -0.1))
            Line((22.9828026503, -0.1), (17.8828026503, -0.1))
            Line((17.8828026503, -0.1), (17.8828026503, 0))
        make_face()
    extrude(amount=-F3_T127_DEPTH)

    split(bisect_by=Plane.XZ.offset(-24), keep=Keep.BOTTOM)


with BuildPart() as f3_tool129:
    # F3_s130 → F3_t131 (new body)
    with BuildSketch(Plane.YZ.offset(35.3828026503)):
        with BuildLine():
            ThreePointArc((19, 0), (22.5355339059, 1.4644660941), (24, 5))
            Line((24, 5), (24.1, 5))
            Line((24.1, 5), (24.1, -0.1))
            Line((24.1, -0.1), (19, -0.1))
            Line((19, -0.1), (19, 0))
        make_face()
    extrude(amount=-F3_T131_DEPTH)

    split(bisect_by=Plane.YZ.offset(22.8828026503), keep=Keep.TOP)


with BuildPart() as f3_tool125_1:
    add(f3_tool125.part)

    # F3_t133: intersect F3_tool129
    add(f3_tool129.part, mode=Mode.INTERSECT)


with BuildPart() as f1_11:
    add(f1_10.part)

    # F3_t123: cut F3_tool125
    add(f3_tool125_1.part, mode=Mode.SUBTRACT)


with BuildPart() as f3_tool136:
    # F3_s137 → F3_t138 (new body)
    with BuildSketch(Plane.YZ.offset(22.8828026503)):
        with BuildLine():
            ThreePointArc((19, 0), (22.5355339059, 1.4644660941), (24, 5))
            Line((24, 5), (24.1, 5))
            Line((24.1, 5), (24.1, -0.1))
            Line((24.1, -0.1), (19, -0.1))
            Line((19, -0.1), (19, 0))
        make_face()
    extrude(amount=-F3_T138_DEPTH)

    split(bisect_by=Plane.YZ.offset(12.8828026503), keep=Keep.BOTTOM)


with BuildPart() as f3_tool140:
    # F3_s141 → F3_t142 (new body)
    with BuildSketch(Plane.XZ.offset(-11.5)):
        with BuildLine():
            ThreePointArc((7.8828026503, 0), (11.4183365563, 1.4644660941), (12.8828026503, 5))
            Line((12.8828026503, 5), (12.9828026503, 5))
            Line((12.9828026503, 5), (12.9828026503, -0.1))
            Line((12.9828026503, -0.1), (7.8828026503, -0.1))
            Line((7.8828026503, -0.1), (7.8828026503, 0))
        make_face()
    extrude(amount=-F3_T142_DEPTH)

    split(bisect_by=Plane.XZ.offset(-24), keep=Keep.TOP)


with BuildPart() as f3_tool136_1:
    add(f3_tool136.part)

    # F3_t144: intersect F3_tool140
    add(f3_tool140.part, mode=Mode.INTERSECT)


with BuildPart() as f1_12:
    add(f1_11.part)

    # F3_t134: cut F3_tool136
    add(f3_tool136_1.part, mode=Mode.SUBTRACT)


with BuildPart() as f3_tool147:
    # F3_s148 → F3_t149 (new body)
    with BuildSketch(Plane.XZ.offset(-24)):
        with BuildLine():
            ThreePointArc((7.8828026503, 0), (11.4183365563, 1.4644660941), (12.8828026503, 5))
            Line((12.8828026503, 5), (12.9828026503, 5))
            Line((12.9828026503, 5), (12.9828026503, -0.1))
            Line((12.9828026503, -0.1), (7.8828026503, -0.1))
            Line((7.8828026503, -0.1), (7.8828026503, 0))
        make_face()
    extrude(amount=-F3_T149_DEPTH)

    split(bisect_by=Plane.XZ.offset(-44), keep=Keep.BOTTOM)


with BuildPart() as f3_tool151:
    # F3_s152 → F3_t153 (new body)
    with BuildSketch(Plane.YZ.offset(25.3828026503)):
        with BuildLine():
            ThreePointArc((39, 0), (42.5355339059, 1.4644660941), (44, 5))
            Line((44, 5), (44.1, 5))
            Line((44.1, 5), (44.1, -0.1))
            Line((44.1, -0.1), (39, -0.1))
            Line((39, -0.1), (39, 0))
        make_face()
    extrude(amount=-F3_T153_DEPTH)

    split(bisect_by=Plane.YZ.offset(12.8828026503), keep=Keep.TOP)


with BuildPart() as f3_tool147_1:
    add(f3_tool147.part)

    # F3_t155: intersect F3_tool151
    add(f3_tool151.part, mode=Mode.INTERSECT)


with BuildPart() as f1_13:
    add(f1_12.part)

    # F3_t145: cut F3_tool147
    add(f3_tool147_1.part, mode=Mode.SUBTRACT)


with BuildPart() as f3_tool158:
    # F3_s159 → F3_t160 (new body)
    with BuildSketch(Plane.YZ.offset(12.8828026503)):
        with BuildLine():
            ThreePointArc((39, 0), (42.5355339059, 1.4644660941), (44, 5))
            Line((44, 5), (44.1, 5))
            Line((44.1, 5), (44.1, -0.1))
            Line((44.1, -0.1), (39, -0.1))
            Line((39, -0.1), (39, 0))
        make_face()
    extrude(amount=-F3_T160_DEPTH)

    split(bisect_by=Plane.YZ.offset(-11.1171973497), keep=Keep.BOTTOM)


with BuildPart() as f3_tool162:
    # F3_s163 → F3_t164 (new body)
    with BuildSketch(Plane.XZ.offset(-56.5)):
        with BuildLine():
            ThreePointArc((-6.1171973497, 0), (-9.6527312556, 1.4644660941), (-11.1171973497, 5))
            Line((-11.1171973497, 5), (-11.2171973497, 5))
            Line((-11.2171973497, 5), (-11.2171973497, -0.1))
            Line((-11.2171973497, -0.1), (-6.1171973497, -0.1))
            Line((-6.1171973497, -0.1), (-6.1171973497, 0))
        make_face()
    extrude(amount=F3_T164_DEPTH)

    split(bisect_by=Plane.XZ.offset(-44), keep=Keep.BOTTOM)


with BuildPart() as f3_tool158_1:
    add(f3_tool158.part)

    # F3_t166: intersect F3_tool162
    add(f3_tool162.part, mode=Mode.INTERSECT)


with BuildPart() as f1_14:
    add(f1_13.part)

    # F3_t156: cut F3_tool158
    add(f3_tool158_1.part, mode=Mode.SUBTRACT)


with BuildPart() as f3_tool169:
    # F3_s170 → F3_t171 (new body)
    with BuildSketch(Plane.XZ.offset(-44)):
        with BuildLine():
            ThreePointArc((-6.1171973497, 0), (-9.6527312556, 1.4644660941), (-11.1171973497, 5))
            Line((-11.1171973497, 5), (-11.2171973497, 5))
            Line((-11.2171973497, 5), (-11.2171973497, -0.1))
            Line((-11.2171973497, -0.1), (-6.1171973497, -0.1))
            Line((-6.1171973497, -0.1), (-6.1171973497, 0))
        make_face()
    extrude(amount=F3_T171_DEPTH)

    split(bisect_by=Plane.XZ.offset(-24), keep=Keep.TOP)


with BuildPart() as f3_tool173:
    # F3_s174 → F3_t175 (new body)
    with BuildSketch(Plane.YZ.offset(1.3828026503)):
        with BuildLine():
            ThreePointArc((19, 0), (22.5355339059, 1.4644660941), (24, 5))
            Line((24, 5), (24.1, 5))
            Line((24.1, 5), (24.1, -0.1))
            Line((24.1, -0.1), (19, -0.1))
            Line((19, -0.1), (19, 0))
        make_face()
    extrude(amount=-F3_T175_DEPTH)

    split(bisect_by=Plane.YZ.offset(-11.1171973497), keep=Keep.TOP)


with BuildPart() as f3_tool169_1:
    add(f3_tool169.part)

    # F3_t177: intersect F3_tool173
    add(f3_tool173.part, mode=Mode.INTERSECT)


with BuildPart() as f1_15:
    add(f1_14.part)

    # F3_t167: cut F3_tool169
    add(f3_tool169_1.part, mode=Mode.SUBTRACT)


with BuildPart() as f3_tool180:
    # F3_s181 → F3_t182 (new body)
    with BuildSketch(Plane.YZ.offset(-11.1171973497)):
        with BuildLine():
            ThreePointArc((19, 0), (22.5355339059, 1.4644660941), (24, 5))
            Line((24, 5), (24.1, 5))
            Line((24.1, 5), (24.1, -0.1))
            Line((24.1, -0.1), (19, -0.1))
            Line((19, -0.1), (19, 0))
        make_face()
    extrude(amount=-F3_T182_DEPTH)

    split(bisect_by=Plane.YZ.offset(-21.1171973497), keep=Keep.BOTTOM)


with BuildPart() as f3_tool184:
    # F3_s185 → F3_t186 (new body)
    with BuildSketch(Plane.XZ.offset(-36.5)):
        with BuildLine():
            ThreePointArc((-16.1171973497, 0), (-19.6527312556, 1.4644660941), (-21.1171973497, 5))
            Line((-21.1171973497, 5), (-21.2171973497, 5))
            Line((-21.2171973497, 5), (-21.2171973497, -0.1))
            Line((-21.2171973497, -0.1), (-16.1171973497, -0.1))
            Line((-16.1171973497, -0.1), (-16.1171973497, 0))
        make_face()
    extrude(amount=F3_T186_DEPTH)

    split(bisect_by=Plane.XZ.offset(-24), keep=Keep.BOTTOM)


with BuildPart() as f3_tool180_1:
    add(f3_tool180.part)

    # F3_t188: intersect F3_tool184
    add(f3_tool184.part, mode=Mode.INTERSECT)


with BuildPart() as f1_16:
    add(f1_15.part)

    # F3_t178: cut F3_tool180
    add(f3_tool180_1.part, mode=Mode.SUBTRACT)


solid = f1_16.part
